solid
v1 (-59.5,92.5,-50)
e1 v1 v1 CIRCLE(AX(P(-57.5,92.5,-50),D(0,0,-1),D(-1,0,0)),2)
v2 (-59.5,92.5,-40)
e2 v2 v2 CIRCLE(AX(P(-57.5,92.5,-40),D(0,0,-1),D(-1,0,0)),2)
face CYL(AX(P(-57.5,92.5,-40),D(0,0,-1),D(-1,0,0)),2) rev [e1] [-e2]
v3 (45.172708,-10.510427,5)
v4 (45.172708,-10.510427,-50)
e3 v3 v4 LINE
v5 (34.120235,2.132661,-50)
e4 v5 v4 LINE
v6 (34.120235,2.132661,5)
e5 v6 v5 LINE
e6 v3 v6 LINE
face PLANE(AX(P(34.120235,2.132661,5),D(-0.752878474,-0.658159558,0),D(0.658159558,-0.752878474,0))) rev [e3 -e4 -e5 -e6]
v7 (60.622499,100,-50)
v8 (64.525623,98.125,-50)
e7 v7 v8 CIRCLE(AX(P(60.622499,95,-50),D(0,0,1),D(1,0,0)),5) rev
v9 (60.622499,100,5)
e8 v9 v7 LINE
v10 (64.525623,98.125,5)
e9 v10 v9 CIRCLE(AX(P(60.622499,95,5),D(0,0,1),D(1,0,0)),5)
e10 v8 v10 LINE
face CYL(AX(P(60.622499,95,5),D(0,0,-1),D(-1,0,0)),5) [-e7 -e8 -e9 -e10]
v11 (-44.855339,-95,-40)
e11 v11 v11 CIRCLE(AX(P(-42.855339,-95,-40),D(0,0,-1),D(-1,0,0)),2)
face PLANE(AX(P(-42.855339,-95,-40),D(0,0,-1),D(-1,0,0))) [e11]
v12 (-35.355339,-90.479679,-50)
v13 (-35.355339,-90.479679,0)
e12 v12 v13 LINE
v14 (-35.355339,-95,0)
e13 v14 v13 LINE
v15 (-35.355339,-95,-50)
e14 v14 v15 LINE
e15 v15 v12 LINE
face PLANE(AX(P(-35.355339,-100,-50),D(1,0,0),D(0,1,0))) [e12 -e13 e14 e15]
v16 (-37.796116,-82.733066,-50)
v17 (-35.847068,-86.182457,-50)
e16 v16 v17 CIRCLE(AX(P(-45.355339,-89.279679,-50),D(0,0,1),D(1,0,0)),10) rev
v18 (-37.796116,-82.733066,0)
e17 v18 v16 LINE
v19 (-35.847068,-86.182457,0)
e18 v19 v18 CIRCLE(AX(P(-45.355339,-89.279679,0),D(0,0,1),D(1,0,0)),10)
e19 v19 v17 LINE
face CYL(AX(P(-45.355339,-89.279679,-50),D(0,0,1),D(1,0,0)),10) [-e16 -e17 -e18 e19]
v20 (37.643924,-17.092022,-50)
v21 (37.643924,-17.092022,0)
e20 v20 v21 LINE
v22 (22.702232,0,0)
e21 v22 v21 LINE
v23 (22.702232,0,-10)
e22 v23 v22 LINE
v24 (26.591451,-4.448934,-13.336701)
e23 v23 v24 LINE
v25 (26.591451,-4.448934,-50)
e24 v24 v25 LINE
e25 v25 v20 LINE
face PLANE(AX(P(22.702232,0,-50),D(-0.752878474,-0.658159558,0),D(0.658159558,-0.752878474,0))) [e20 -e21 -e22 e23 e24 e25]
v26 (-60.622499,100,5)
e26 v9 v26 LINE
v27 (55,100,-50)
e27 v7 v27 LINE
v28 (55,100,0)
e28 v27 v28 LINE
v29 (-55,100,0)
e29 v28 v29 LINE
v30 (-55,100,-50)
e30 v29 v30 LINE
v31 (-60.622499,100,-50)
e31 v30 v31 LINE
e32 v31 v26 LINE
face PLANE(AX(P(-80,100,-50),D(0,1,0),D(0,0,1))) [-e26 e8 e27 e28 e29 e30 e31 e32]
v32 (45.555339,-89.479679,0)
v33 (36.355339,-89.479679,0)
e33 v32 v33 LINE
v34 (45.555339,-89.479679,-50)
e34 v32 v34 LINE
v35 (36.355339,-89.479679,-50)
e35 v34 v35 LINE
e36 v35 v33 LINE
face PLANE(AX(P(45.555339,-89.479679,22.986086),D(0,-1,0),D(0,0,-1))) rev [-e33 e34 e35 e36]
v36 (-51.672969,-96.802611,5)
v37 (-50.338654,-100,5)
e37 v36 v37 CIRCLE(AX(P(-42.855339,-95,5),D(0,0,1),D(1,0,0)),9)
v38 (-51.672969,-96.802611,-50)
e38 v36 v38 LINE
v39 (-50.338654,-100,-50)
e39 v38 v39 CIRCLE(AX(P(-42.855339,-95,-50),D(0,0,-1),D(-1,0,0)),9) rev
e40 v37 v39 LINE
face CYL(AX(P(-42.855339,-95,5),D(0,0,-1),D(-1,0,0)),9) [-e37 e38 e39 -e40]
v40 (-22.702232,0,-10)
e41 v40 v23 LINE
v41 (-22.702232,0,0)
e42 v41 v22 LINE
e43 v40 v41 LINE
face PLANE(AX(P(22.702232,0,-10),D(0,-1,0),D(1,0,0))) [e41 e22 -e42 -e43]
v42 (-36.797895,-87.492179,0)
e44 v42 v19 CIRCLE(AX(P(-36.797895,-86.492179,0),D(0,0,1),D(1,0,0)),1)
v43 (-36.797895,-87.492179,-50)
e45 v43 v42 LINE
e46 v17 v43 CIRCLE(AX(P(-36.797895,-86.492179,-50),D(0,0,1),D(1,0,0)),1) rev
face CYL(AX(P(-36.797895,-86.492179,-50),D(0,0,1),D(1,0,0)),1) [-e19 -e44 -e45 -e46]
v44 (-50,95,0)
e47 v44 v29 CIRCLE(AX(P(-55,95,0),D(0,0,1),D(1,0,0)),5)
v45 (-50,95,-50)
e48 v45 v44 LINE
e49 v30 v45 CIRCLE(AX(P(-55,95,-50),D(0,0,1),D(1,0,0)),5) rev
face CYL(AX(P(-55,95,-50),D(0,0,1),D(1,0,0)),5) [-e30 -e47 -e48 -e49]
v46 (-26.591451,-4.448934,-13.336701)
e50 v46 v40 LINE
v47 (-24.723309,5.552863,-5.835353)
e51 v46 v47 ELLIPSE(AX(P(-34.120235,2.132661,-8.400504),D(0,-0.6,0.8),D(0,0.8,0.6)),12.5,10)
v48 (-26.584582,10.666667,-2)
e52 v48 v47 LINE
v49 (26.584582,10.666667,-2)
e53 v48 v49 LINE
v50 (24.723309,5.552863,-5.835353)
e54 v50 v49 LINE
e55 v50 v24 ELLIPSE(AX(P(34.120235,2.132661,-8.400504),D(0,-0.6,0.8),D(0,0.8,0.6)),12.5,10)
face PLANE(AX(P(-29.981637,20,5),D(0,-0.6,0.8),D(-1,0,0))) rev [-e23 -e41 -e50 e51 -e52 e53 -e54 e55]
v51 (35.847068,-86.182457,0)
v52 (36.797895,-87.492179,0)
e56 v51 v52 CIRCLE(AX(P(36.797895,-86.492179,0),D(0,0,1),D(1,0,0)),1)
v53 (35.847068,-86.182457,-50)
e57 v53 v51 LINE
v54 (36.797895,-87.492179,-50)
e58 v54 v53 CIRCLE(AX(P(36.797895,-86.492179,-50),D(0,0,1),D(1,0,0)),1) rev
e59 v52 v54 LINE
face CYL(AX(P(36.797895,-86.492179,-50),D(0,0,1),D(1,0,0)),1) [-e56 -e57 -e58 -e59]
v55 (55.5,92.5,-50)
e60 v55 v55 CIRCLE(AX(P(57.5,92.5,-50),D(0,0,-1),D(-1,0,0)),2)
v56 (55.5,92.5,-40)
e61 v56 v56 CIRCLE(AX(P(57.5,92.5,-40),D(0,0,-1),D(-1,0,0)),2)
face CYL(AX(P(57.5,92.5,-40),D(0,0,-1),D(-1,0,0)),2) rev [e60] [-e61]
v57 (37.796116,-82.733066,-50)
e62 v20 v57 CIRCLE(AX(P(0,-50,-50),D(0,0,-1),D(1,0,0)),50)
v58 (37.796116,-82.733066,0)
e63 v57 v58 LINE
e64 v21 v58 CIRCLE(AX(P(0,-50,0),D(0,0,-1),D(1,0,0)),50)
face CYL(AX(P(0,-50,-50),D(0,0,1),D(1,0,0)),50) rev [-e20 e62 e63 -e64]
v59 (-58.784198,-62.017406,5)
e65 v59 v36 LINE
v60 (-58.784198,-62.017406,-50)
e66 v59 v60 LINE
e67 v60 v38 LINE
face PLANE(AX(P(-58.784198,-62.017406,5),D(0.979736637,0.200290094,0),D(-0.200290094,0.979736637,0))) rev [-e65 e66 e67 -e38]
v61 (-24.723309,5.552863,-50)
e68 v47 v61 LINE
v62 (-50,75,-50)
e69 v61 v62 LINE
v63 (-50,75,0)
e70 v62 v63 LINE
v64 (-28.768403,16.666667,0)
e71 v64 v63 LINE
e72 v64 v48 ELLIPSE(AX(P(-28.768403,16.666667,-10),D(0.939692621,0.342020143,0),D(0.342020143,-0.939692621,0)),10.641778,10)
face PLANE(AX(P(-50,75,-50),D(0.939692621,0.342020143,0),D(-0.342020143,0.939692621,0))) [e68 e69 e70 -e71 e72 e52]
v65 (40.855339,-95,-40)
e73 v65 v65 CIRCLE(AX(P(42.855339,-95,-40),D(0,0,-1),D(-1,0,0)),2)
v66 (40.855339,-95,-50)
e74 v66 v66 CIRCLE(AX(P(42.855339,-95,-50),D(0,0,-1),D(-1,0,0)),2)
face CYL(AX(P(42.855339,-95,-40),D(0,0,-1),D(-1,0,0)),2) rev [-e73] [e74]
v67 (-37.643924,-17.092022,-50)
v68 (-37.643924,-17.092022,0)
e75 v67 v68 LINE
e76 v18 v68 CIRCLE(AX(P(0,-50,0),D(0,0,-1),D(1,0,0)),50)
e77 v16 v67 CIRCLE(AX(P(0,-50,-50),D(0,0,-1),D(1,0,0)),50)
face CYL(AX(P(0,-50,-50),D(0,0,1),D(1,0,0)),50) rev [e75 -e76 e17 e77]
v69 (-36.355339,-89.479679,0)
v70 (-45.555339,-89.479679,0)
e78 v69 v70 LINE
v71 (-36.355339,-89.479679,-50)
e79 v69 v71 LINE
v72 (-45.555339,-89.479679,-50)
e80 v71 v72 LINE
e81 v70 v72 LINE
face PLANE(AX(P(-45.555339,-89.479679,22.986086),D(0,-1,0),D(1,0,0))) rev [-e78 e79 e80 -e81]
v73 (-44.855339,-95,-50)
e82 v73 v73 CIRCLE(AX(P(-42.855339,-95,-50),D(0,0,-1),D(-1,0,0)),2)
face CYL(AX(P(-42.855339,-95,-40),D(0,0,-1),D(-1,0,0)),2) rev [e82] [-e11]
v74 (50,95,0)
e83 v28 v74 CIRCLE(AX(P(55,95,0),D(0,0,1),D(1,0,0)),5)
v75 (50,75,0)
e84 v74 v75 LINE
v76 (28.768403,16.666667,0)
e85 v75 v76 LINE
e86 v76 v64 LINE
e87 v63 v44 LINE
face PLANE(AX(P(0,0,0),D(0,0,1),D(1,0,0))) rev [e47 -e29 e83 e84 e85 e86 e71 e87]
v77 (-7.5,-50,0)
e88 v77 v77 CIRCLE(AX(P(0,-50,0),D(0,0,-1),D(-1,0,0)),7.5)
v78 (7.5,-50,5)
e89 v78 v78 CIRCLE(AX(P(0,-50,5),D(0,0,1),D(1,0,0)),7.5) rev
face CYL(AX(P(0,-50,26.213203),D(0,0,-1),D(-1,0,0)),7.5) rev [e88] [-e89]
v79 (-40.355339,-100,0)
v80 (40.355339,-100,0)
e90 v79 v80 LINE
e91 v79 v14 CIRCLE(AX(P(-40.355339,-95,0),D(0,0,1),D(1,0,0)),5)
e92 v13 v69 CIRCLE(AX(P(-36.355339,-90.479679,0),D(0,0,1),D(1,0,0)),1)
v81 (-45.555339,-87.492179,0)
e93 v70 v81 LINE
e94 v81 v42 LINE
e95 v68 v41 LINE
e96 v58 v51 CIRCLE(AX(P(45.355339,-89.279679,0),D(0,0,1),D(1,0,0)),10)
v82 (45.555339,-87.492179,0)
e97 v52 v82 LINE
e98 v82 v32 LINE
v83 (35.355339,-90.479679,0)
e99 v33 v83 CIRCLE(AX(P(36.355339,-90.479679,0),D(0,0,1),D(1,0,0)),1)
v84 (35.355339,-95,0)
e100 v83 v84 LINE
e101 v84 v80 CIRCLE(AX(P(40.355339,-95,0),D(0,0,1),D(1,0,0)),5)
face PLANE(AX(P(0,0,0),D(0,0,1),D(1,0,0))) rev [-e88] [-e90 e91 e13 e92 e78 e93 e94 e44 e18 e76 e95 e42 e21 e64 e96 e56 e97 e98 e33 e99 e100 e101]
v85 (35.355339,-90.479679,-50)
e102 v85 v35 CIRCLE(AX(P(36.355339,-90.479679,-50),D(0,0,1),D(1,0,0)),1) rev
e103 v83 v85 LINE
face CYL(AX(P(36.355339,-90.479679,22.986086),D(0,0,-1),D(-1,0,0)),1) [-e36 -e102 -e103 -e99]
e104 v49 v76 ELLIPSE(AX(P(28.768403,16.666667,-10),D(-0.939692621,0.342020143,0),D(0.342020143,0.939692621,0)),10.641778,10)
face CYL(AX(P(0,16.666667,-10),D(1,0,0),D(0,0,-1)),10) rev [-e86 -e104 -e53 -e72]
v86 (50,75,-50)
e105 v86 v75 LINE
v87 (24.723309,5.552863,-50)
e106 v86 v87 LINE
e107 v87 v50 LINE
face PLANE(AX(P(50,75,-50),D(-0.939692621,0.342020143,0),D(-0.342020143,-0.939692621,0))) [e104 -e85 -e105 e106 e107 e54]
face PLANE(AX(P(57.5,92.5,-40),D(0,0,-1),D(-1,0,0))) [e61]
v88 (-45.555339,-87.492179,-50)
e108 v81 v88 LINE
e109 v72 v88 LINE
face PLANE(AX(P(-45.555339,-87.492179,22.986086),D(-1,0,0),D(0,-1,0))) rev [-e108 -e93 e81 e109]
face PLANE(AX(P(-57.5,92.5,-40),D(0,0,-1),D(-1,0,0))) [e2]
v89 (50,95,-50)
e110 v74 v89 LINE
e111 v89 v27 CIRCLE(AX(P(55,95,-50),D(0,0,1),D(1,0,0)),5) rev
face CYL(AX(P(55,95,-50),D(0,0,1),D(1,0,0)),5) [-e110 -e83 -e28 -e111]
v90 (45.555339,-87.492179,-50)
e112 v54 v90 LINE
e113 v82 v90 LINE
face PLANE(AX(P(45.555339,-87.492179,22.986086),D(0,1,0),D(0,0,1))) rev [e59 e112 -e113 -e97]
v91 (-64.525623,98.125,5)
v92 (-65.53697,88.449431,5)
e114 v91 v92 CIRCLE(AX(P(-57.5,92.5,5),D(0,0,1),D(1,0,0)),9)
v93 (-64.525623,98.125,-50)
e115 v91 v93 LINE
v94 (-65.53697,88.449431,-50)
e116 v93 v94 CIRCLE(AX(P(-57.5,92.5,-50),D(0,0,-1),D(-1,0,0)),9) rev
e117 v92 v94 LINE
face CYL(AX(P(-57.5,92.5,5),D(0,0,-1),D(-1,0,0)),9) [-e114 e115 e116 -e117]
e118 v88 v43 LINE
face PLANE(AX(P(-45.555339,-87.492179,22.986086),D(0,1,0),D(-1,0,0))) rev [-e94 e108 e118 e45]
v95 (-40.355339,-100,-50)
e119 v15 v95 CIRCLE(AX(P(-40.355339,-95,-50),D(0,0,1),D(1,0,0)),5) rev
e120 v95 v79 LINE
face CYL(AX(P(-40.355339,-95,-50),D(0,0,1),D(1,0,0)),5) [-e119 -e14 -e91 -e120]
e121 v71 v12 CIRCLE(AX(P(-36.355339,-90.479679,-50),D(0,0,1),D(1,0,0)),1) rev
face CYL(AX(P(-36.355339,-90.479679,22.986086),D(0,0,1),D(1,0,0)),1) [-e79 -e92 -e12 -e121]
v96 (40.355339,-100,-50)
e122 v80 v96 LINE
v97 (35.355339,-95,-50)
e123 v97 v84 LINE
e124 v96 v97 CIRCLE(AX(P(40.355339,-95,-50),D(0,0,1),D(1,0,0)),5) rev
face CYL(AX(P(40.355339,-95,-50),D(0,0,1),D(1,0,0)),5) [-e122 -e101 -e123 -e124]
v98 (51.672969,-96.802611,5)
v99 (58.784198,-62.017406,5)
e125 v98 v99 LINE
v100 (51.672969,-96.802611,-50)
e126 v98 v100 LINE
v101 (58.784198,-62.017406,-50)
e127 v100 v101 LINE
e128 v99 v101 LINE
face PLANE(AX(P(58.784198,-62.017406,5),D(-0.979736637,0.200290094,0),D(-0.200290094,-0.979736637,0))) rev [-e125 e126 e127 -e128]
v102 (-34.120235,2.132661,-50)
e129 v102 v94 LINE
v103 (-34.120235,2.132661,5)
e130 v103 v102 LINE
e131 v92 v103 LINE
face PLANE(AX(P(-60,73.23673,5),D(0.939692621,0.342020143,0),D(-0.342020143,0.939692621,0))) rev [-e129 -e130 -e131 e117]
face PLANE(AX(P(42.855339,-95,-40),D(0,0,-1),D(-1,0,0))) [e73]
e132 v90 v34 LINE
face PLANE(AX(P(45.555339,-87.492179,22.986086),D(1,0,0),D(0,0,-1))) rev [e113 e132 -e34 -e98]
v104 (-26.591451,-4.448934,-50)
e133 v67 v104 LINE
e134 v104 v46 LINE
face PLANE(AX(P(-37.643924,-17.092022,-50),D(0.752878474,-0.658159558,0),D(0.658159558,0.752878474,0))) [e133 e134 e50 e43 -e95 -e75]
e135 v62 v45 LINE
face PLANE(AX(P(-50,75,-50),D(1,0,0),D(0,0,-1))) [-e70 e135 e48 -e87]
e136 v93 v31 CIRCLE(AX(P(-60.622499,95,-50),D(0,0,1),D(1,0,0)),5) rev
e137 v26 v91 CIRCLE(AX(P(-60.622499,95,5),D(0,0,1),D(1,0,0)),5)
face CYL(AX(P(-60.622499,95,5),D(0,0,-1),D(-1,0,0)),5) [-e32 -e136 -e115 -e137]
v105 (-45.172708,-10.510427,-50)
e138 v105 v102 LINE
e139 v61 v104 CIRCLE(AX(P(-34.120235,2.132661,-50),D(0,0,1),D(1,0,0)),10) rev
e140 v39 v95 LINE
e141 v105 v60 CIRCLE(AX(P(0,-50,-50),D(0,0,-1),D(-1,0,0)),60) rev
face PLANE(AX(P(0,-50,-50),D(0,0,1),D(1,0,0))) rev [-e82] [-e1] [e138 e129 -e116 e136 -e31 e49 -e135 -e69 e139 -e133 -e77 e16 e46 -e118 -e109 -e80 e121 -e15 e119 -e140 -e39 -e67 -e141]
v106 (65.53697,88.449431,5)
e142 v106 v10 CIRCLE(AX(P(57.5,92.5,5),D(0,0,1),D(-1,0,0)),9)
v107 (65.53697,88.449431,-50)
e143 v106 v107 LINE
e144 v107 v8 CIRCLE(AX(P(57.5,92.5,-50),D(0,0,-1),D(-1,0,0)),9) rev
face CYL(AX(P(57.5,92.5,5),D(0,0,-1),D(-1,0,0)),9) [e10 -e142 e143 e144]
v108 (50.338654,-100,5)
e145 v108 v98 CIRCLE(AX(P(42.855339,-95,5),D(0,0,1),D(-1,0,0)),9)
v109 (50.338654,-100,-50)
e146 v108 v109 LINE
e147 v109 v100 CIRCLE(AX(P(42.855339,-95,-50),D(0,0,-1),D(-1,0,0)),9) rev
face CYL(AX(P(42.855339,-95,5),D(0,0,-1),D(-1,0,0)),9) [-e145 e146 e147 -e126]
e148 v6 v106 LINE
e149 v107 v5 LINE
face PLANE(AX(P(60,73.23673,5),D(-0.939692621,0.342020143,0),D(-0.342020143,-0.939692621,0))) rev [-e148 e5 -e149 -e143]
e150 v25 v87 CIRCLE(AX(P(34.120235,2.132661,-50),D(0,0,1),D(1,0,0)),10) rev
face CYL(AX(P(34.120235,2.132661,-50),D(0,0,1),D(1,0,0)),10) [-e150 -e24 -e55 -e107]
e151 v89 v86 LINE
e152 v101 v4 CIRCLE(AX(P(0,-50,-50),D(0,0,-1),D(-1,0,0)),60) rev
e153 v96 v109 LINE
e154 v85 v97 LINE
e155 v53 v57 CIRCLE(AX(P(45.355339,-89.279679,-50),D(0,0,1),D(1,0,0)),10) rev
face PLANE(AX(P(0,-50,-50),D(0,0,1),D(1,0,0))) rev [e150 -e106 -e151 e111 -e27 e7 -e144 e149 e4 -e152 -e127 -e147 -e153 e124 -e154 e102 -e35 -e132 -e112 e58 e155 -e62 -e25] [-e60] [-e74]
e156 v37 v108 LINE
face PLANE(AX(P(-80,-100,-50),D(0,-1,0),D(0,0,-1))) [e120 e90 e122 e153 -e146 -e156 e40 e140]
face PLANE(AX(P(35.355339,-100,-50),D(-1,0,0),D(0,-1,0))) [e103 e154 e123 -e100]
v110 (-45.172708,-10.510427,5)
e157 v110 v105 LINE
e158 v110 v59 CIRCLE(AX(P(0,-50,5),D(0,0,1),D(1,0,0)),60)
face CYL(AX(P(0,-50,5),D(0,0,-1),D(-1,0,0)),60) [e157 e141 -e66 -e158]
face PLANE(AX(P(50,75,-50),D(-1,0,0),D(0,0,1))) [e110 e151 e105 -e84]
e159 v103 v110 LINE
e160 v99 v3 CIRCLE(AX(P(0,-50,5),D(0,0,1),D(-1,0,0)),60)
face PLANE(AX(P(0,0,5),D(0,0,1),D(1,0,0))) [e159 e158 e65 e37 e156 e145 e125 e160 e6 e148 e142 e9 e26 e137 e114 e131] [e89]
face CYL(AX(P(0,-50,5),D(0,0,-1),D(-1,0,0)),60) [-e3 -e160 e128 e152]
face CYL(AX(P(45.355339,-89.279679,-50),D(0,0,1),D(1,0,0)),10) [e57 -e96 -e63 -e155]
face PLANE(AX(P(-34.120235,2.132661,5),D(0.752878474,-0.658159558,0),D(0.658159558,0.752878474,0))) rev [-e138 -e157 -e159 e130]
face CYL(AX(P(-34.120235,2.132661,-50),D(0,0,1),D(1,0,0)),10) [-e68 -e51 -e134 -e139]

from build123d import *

# Parameters (mm, degrees)
BOSS_EXTRUDE1_DEPTH     = 50
BOSS_EXTRUDE1_2_DEPTH   = 50
BOSS_EXTRUDE2_DEPTH     = 10
CHAMFER1_SIZE           = 15
CHAMFER1_SIZE_2         = 20
SKETCH4_W               = 160
SKETCH4_H               = 200
BOSS_EXTRUDE3_DEPTH     = 5
FILLET1_R               = 10
SKETCH5_R               = 7.5
CUT_EXTRUDE1_DEPTH      = 5
CUT_EXTRUDE5_DEPTH      = 140.373598648
CUT_EXTRUDE5_DEPTH_BACK = 140.373598648
FILLET4_R               = 5
SKETCH12_R              = 2
CUT_EXTRUDE6_DEPTH      = 10
SKETCH13_W              = 22.9
SKETCH13_H              = 1.9875
CUT_EXTRUDE7_DEPTH      = 50
FILLET5_R               = 1


with BuildPart() as part:
    # Sketch2 → Boss-Extrude1 (new body)
    with BuildSketch(Plane.XY):
        with BuildLine():
            Line((-50, 75), (-22.70223243, 0))
            Line((-22.70223243, 0), (-37.64392369, -17.092022104))
            ThreePointArc((-37.64392369, -17.092022104), (-49.971924127, -51.675350432), (-35.355339059, -85.355339059))
            Line((-35.355339059, -85.355339059), (-35.355339059, -100))
            Line((-35.355339059, -100), (-80, -100))
            Line((-80, -100), (-80, 100))
            Line((-80, 100), (-50, 100))
            Line((-50, 100), (-50, 75))
        make_face()
    extrude(amount=-BOSS_EXTRUDE1_DEPTH)



with BuildPart() as body_2:
    # Sketch2 → Boss-Extrude1 2 (new body)
    with BuildSketch(Plane.XY):
        with BuildLine():
            Line((50, 75), (22.70223243, 0))
            Line((22.70223243, 0), (37.64392369, -17.092022104))
            ThreePointArc((37.64392369, -17.092022104), (49.971924127, -51.675350432), (35.355339059, -85.355339059))
            Line((35.355339059, -85.355339059), (35.355339059, -100))
            Line((35.355339059, -100), (80, -100))
            Line((80, -100), (80, 100))
            Line((80, 100), (50, 100))
            Line((50, 100), (50, 75))
        make_face()
    extrude(amount=-BOSS_EXTRUDE1_2_DEPTH)


with BuildPart() as part_1:
    add(part.part)

    add(body_2.part)  # Boss-Extrude2 merges body 2
    # Sketch3 → Boss-Extrude2 (add)
    with BuildSketch(Plane.XY):
        Polygon((-29.981637115, 20), (29.981637115, 20), (22.70223243, 0), (-22.70223243, 0), align=None)
    extrude(amount=-BOSS_EXTRUDE2_DEPTH)

    # Chamfer1
    # the kernel refuses this chamfer: 20, 15 mm, written as the material it takes off along each edge
    with BuildSketch(Plane(origin=(-81.595588718, 20, -10), x_dir=(0, 0.041308380137954244, 0.9991464445867674), z_dir=(1, 0, 0))) as chamfer1_piece_1_section:
        Polygon((CHAMFER1_SIZE * 0.999146444587, CHAMFER1_SIZE * 0.041308380138), (-CHAMFER1_SIZE_2 * 0.041308380138, CHAMFER1_SIZE_2 * 0.999146444587), (0, 0), align=None)
    chamfer1_piece_1 = extrude(amount=163.191177435, mode=Mode.PRIVATE)
    chamfer1_piece_1 = split(chamfer1_piece_1, bisect_by=Plane(origin=(-24.447399798, 4.794807938, -4.975922198), z_dir=(0.9396926207859094, 0.3420201433256661, 0)), keep=Keep.TOP, mode=Mode.PRIVATE)
    chamfer1_piece_1 = split(chamfer1_piece_1, bisect_by=Plane(origin=(24.447399798, 4.794807938, -4.975922198), z_dir=(-0.939692620785907, 0.34202014332567265, 0)), keep=Keep.TOP, mode=Mode.PRIVATE)
    add(chamfer1_piece_1, mode=Mode.SUBTRACT)

    # Sketch4 → Boss-Extrude3 (add)
    with BuildSketch(Plane.XY):
        Rectangle(SKETCH4_W, SKETCH4_H)
    extrude(amount=BOSS_EXTRUDE3_DEPTH)

    # Fillet1
    fillet1_edges = [part_1.edges().sort_by_distance(p)[0] for p in [
        (-22.70223243, 0, -30),
        (-35.355339059, -85.355339059, -25),
        (35.355339059, -85.355339059, -25),
        (22.70223243, 0, -30),
        (0, 13.333333333, 0),
    ]]
    fillet(fillet1_edges, radius=FILLET1_R)

    # Sketch5 → Cut-Extrude1 (cut)
    with BuildSketch(Plane(origin=(0, 0, 0), x_dir=(-1, 0, 0), z_dir=(0, 0, -1))):
        with Locations((0, -50)):
            Circle(SKETCH5_R)
    extrude(amount=-CUT_EXTRUDE1_DEPTH, mode=Mode.SUBTRACT)

    # Sketch11 → Cut-Extrude5 (cut, two sides: drawn at the far end of the back side and taken through both)
    with BuildSketch(Plane(origin=(0, 0, -50), x_dir=(-1, 0, 0), z_dir=(0, 0, -1)).offset(-CUT_EXTRUDE5_DEPTH_BACK)):
        with BuildLine():
            Line((-58.784198233, -62.017405631), (-51.672968794, -96.802610845))
            ThreePointArc((-51.672968794, -96.802610845), (-51.161121522, -98.466118532), (-50.338653833, -100))
            Line((-50.338653833, -100), (-80, -100))
            Line((-80, -100), (-80, 100))
            Line((-80, 100), (-62.474937186, 100))
            ThreePointArc((-62.474937186, 100), (-66.199502533, 94.806221081), (-65.536970349, 88.4494312))
            Line((-65.536970349, 88.4494312), (-60, 73.236730193))
            Line((-60, 73.236730193), (-34.120235365, 2.132661237))
            Line((-34.120235365, 2.132661237), (-45.172708428, -10.510426525))
            ThreePointArc((-45.172708428, -10.510426525), (-58.008635864, -34.670350128), (-58.784198233, -62.017405631))
        make_face()
        with BuildLine():
            Line((34.120235365, 2.132661237), (45.172708428, -10.510426525))
            ThreePointArc((45.172708428, -10.510426525), (58.008635864, -34.670350128), (58.784198233, -62.017405631))
            Line((58.784198233, -62.017405631), (51.672968794, -96.802610845))
            ThreePointArc((51.672968794, -96.802610845), (51.161121522, -98.466118532), (50.338653833, -100))
            Line((50.338653833, -100), (80, -100))
            Line((80, -100), (80, 100))
            Line((80, 100), (62.474937186, 100))
            ThreePointArc((62.474937186, 100), (66.199502533, 94.806221081), (65.536970349, 88.4494312))
            Line((65.536970349, 88.4494312), (60, 73.236730193))
            Line((60, 73.236730193), (34.120235365, 2.132661237))
        make_face()
    extrude(amount=CUT_EXTRUDE5_DEPTH + CUT_EXTRUDE5_DEPTH_BACK, mode=Mode.SUBTRACT)

    # Fillet4
    fillet4_edges = [part_1.edges().sort_by_distance(p)[0] for p in [
        (-35.355339059, -100, -25),
        (-50, 100, -25),
        (62.474937186, 100, -22.5),
        (-62.474937186, 100, -22.5),
        (50, 100, -25),
        (35.355339059, -100, -25),
    ]]
    fillet(fillet4_edges, radius=FILLET4_R)

    # Sketch12 → Cut-Extrude6 (cut)
    with BuildSketch(Plane(origin=(0, 0, -50), x_dir=(-1, 0, 0), z_dir=(0, 0, -1))):
        with Locations((-57.5, 92.5)):
            Circle(SKETCH12_R)
        with Locations((57.5, 92.5)):
            Circle(SKETCH12_R)
        with Locations((-42.855339059, -95)):
            Circle(SKETCH12_R)
        with Locations((42.855339059, -95)):
            Circle(SKETCH12_R)
    extrude(amount=-CUT_EXTRUDE6_DEPTH, mode=Mode.SUBTRACT)

    # Sketch13 → Cut-Extrude7 (cut)
    with BuildSketch(Plane(origin=(0, 0, -50), x_dir=(-1, 0, 0), z_dir=(0, 0, -1))):
        with Locations((-34.105339059, -88.485929464)):
            Rectangle(SKETCH13_W, SKETCH13_H)
        with Locations((34.105339059, -88.485929464)):
            Rectangle(SKETCH13_W, SKETCH13_H)
    extrude(amount=-CUT_EXTRUDE7_DEPTH, mode=Mode.SUBTRACT)

    # Fillet5
    fillet5_edges = [part_1.edges().sort_by_distance(p)[0] for p in [
        (-35.516393803, -87.492179464, -25),
        (35.516393803, -87.492179464, -25),
        (35.355339059, -89.479679464, -25),
        (-35.355339059, -89.479679464, -25),
    ]]
    fillet(fillet5_edges, radius=FILLET5_R)


solid = part_1.part
